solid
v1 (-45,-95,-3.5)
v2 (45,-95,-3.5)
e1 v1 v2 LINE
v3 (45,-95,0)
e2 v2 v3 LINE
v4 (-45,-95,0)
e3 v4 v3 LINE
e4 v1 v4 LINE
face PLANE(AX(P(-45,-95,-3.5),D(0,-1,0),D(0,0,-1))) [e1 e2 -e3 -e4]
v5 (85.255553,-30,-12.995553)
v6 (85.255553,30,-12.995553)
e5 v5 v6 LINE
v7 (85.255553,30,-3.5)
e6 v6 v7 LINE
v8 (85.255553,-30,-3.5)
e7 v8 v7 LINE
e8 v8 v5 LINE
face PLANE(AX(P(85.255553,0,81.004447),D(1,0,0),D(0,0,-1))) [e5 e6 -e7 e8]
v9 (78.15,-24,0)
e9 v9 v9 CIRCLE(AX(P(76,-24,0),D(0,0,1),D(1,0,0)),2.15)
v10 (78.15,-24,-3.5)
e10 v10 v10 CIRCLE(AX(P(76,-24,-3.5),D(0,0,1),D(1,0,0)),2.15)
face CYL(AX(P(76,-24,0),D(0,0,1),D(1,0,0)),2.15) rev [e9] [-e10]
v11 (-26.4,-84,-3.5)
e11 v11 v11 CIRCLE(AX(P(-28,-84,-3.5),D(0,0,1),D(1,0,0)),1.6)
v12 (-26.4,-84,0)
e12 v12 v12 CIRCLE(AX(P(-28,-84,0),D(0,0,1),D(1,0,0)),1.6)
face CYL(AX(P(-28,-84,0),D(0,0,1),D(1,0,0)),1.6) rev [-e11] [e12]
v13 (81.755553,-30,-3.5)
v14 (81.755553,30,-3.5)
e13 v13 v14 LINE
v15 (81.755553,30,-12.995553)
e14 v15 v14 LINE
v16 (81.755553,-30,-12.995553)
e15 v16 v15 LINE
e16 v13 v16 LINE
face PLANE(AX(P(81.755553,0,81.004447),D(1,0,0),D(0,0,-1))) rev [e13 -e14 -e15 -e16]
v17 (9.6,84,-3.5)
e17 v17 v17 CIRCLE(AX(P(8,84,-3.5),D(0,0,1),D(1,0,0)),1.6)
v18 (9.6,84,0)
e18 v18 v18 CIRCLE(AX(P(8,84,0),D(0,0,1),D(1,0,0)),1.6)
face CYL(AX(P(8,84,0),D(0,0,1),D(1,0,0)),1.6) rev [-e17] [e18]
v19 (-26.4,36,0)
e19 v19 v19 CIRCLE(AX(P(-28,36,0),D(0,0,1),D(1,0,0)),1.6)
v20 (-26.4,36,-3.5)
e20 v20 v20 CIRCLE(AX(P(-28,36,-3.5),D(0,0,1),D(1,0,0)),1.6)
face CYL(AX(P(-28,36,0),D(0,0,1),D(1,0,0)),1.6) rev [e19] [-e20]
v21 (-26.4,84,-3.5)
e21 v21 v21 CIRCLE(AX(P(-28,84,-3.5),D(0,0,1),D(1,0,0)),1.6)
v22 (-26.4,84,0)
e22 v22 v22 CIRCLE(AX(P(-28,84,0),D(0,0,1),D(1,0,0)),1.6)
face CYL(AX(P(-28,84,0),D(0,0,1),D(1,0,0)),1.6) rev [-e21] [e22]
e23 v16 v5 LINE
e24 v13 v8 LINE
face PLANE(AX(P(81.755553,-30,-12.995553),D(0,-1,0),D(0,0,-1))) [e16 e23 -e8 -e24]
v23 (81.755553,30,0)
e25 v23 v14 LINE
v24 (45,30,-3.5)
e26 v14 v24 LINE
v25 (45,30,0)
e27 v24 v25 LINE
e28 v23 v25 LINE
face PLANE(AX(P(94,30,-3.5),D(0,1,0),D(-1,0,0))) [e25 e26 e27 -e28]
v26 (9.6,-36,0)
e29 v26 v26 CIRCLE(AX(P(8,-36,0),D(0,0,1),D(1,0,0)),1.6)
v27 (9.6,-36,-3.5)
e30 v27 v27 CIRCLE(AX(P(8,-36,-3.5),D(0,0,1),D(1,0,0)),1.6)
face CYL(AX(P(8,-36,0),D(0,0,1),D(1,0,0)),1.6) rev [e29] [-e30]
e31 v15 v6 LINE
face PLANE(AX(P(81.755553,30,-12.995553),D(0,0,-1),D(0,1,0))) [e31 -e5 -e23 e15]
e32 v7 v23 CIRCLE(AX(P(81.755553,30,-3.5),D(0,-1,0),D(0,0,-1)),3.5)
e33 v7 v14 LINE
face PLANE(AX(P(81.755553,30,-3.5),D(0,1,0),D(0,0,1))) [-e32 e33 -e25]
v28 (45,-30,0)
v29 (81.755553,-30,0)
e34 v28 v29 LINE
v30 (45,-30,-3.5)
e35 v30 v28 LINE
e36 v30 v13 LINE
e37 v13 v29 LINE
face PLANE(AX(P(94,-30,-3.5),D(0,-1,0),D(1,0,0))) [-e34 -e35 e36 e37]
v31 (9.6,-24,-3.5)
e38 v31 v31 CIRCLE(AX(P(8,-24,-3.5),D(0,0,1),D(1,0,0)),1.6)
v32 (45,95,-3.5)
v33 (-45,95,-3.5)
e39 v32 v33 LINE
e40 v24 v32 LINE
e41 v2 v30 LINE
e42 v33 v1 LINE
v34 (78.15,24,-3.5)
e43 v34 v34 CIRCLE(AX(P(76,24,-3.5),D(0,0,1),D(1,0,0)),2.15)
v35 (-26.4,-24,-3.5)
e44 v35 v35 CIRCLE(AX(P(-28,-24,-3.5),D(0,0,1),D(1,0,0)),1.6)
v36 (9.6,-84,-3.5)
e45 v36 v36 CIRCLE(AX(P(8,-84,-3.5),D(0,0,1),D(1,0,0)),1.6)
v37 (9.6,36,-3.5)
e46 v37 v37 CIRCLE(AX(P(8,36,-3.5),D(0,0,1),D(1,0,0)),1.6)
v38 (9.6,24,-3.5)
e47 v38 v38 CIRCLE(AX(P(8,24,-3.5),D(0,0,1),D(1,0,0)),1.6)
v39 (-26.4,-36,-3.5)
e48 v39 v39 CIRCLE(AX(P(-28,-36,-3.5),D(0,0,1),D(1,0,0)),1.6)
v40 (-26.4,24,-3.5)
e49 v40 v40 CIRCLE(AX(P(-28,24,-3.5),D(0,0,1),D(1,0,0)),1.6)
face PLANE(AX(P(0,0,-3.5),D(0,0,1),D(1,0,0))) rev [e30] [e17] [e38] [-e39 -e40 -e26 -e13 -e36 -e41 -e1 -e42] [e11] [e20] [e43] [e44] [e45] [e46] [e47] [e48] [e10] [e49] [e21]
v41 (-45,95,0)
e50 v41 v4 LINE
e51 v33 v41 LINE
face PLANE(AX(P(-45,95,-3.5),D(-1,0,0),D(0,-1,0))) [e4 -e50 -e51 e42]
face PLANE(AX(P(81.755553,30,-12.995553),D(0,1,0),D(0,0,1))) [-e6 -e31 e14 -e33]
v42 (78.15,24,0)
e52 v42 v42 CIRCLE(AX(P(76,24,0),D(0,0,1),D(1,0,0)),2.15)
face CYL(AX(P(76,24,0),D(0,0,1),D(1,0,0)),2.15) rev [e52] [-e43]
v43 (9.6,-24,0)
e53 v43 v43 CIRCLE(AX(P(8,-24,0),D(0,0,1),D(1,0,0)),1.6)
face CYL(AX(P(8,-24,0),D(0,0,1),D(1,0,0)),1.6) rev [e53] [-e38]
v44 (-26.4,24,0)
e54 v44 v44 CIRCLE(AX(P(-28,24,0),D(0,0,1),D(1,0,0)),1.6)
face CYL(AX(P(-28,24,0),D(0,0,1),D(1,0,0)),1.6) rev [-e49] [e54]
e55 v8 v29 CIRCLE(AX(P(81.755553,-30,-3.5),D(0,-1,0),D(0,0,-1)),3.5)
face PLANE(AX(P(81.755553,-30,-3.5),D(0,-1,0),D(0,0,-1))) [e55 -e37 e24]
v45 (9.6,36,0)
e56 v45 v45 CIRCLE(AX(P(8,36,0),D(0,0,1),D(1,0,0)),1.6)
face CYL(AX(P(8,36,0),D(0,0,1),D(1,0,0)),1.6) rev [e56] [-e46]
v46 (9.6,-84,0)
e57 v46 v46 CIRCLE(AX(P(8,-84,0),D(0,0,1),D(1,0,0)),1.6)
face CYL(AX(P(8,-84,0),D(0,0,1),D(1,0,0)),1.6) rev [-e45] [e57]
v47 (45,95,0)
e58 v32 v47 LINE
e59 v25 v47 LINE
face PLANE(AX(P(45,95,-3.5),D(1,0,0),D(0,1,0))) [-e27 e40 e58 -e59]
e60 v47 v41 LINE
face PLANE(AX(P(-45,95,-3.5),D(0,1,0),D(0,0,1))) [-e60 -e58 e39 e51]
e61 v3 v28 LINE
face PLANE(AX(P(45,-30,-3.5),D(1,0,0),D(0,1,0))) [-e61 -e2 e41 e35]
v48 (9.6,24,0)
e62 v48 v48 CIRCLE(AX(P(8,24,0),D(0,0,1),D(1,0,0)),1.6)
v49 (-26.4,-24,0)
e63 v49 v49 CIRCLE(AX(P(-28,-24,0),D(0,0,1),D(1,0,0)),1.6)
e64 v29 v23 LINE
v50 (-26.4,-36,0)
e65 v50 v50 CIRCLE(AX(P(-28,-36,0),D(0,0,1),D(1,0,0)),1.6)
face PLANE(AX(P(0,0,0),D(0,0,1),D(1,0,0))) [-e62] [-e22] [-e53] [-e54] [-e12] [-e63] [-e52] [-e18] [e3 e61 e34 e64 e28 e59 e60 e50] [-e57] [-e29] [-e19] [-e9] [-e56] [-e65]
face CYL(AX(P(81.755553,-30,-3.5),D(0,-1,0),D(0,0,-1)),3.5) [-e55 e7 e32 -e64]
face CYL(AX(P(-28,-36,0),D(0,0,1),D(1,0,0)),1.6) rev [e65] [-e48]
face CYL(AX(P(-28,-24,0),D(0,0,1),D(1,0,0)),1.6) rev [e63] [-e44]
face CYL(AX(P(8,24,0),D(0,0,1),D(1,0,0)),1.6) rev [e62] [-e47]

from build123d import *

# Parameters (mm, degrees)
BASE_FLANGIA1_DEPTH                  = 3.5
PIEGATURA_START                      = -30
PIEGATURA_DELLO_SCHIZZO1_DEPTH       = 60
PIEGATURA_DELLO_SCHIZZO1_2_OUTLINE_W = 3.5
PIEGATURA_DELLO_SCHIZZO1_2_OUTLINE_H = 9.495553214
PIEGATURA_DELLO_SCHIZZO1_2_DEPTH     = 60
FORO_PER_VITE_M4_1_D                 = 4.3
FORO_PER_VITE_M4_1_DEPTH             = 20
FORO_PER_VITE_M4_1_TIP               = 1.291850331
FORO_PER_VITE_M3_1_AT_2_COUNT        = 2
FORO_PER_VITE_M3_1_AT_2_PITCH        = 48
FORO_PER_VITE_M3_1_AT_3_COUNT        = 2
FORO_PER_VITE_M3_1_AT_3_PITCH        = 60
FORO_PER_VITE_M3_1_AT_4_COUNT        = 2
FORO_PER_VITE_M3_1_AT_4_PITCH        = 36
RIPETIZIONE_A_L1_COUNT               = 2
RIPETIZIONE_A_L1_PITCH               = 60
RIPETIZIONE_A_L1_COL_COUNT           = 2
RIPETIZIONE_A_L1_COL_PITCH           = 60


# Read off the part's stored shape, not the designer's step: Piegatura dello schizzo1
# Sheet-metal steps are written as plain solids
with BuildPart() as part:
    # Schizzo1 → Base-Flangia1 (new body)
    with BuildSketch(Plane.XY):
        Polygon((-45, 95), (45, 95), (45, 30), (94, 30), (94, -30), (45, -30), (45, -95), (-45, -95), align=None)
    extrude(amount=-BASE_FLANGIA1_DEPTH)

    # Piegatura dello schizzo1 outline → Piegatura dello schizzo1 (cut)
    with BuildSketch(Plane(origin=(0, 0, 0), x_dir=(1, 0, 0), z_dir=(0, 1, 0)).offset(PIEGATURA_START)):
        with BuildLine():
            Line((94, 3.5), (85.255553214, 3.5))
            ThreePointArc((85.255553214, 3.5), (84.230426948, 1.025126266), (81.755553214, 0))
            Line((81.755553214, 0), (94, 0))
            Line((94, 0), (94, 3.5))
        make_face()
    extrude(amount=PIEGATURA_DELLO_SCHIZZO1_DEPTH, mode=Mode.SUBTRACT)

    # Piegatura dello schizzo1 2 outline → Piegatura dello schizzo1 2 (add)
    with BuildSketch(Plane(origin=(0, 0, 0), x_dir=(1, 0, 0), z_dir=(0, 1, 0)).offset(PIEGATURA_START)):
        with Locations((83.505553214, 8.247776607)):
            Rectangle(PIEGATURA_DELLO_SCHIZZO1_2_OUTLINE_W, PIEGATURA_DELLO_SCHIZZO1_2_OUTLINE_H)
    extrude(amount=PIEGATURA_DELLO_SCHIZZO1_2_DEPTH)

    # Foro per Vite M4-1
    with Locations(Plane(origin=(76, 24, 0), x_dir=(1, 0, 0), z_dir=(0, 0, 1))):
        with Locations((0, 0), (0, -48)):
            Hole(FORO_PER_VITE_M4_1_D / 2, depth=FORO_PER_VITE_M4_1_DEPTH)
            with Locations((0, 0, -(FORO_PER_VITE_M4_1_DEPTH + FORO_PER_VITE_M4_1_TIP / 2))):  # 118° drill point
                Cone(0, FORO_PER_VITE_M4_1_D / 2, FORO_PER_VITE_M4_1_TIP, mode=Mode.SUBTRACT)

    # Schizzo9 → Foro per Vite M3-1 (revolve, cut)
    with BuildSketch(Plane(origin=(-28, 24, 0), x_dir=(0, -1, 0), z_dir=(1, 0, 0))):
        Polygon((0, 0), (0, 20.96137699), (1.6, 20), (1.6, 0), align=None)
    foro_per_vite_m3_1 = revolve(axis=Axis((-28, 24, 6.35), (0, 0, -1)), mode=Mode.SUBTRACT)

    # Foro per Vite M3-1 at 2: Foro per Vite M3-1 ×2
    with Locations(*[(0, -i * FORO_PER_VITE_M3_1_AT_2_PITCH, 0) for i in range(1, FORO_PER_VITE_M3_1_AT_2_COUNT)]):
        add(foro_per_vite_m3_1, mode=Mode.SUBTRACT)

    # Foro per Vite M3-1 at 3: Foro per Vite M3-1 ×2
    with Locations(*[Vector(0.6000000000000001, -0.7999999999999999, 0) * (i * FORO_PER_VITE_M3_1_AT_3_PITCH) for i in range(1, FORO_PER_VITE_M3_1_AT_3_COUNT)]):
        add(foro_per_vite_m3_1, mode=Mode.SUBTRACT)

    # Foro per Vite M3-1 at 4: Foro per Vite M3-1 ×2
    with Locations(*[(i * FORO_PER_VITE_M3_1_AT_4_PITCH, 0, 0) for i in range(1, FORO_PER_VITE_M3_1_AT_4_COUNT)]):
        add(foro_per_vite_m3_1, mode=Mode.SUBTRACT)

    # Ripetizione a L1: Foro per Vite M3-1 ×2
    with Locations(*[(0, -i * RIPETIZIONE_A_L1_PITCH, 0) for i in range(1, RIPETIZIONE_A_L1_COUNT)]):
        add(foro_per_vite_m3_1, mode=Mode.SUBTRACT)

    # Ripetizione a L1 copy 1 sketch → Ripetizione a L1 copy 1 (revolve, cut)
    with BuildSketch(Plane(origin=(-28, -84, 0), x_dir=(0, -1, 0), z_dir=(1, 0, 0))):
        Polygon((0, 0), (0, 20.96137699), (1.6, 20), (1.6, 0), align=None)
    revolve(axis=Axis((-28, -84, 6.35), (0, 0, -1)), mode=Mode.SUBTRACT)

    # Ripetizione a L1 copy 2 sketch → Ripetizione a L1 copy 2 (revolve, cut)
    with BuildSketch(Plane(origin=(8, -84, 0), x_dir=(0, -1, 0), z_dir=(1, 0, 0))):
        Polygon((0, 0), (0, 20.96137699), (1.6, 20), (1.6, 0), align=None)
    revolve(axis=Axis((8, -84, 6.35), (0, 0, -1)), mode=Mode.SUBTRACT)

    # Ripetizione a L1 copy 3 sketch → Ripetizione a L1 copy 3 (revolve, cut)
    with BuildSketch(Plane(origin=(8, -36, 0), x_dir=(0, -1, 0), z_dir=(1, 0, 0))):
        Polygon((0, 0), (0, 20.96137699), (1.6, 20), (1.6, 0), align=None)
    revolve(axis=Axis((8, -36, 6.35), (0, 0, -1)), mode=Mode.SUBTRACT)

    # Ripetizione a L1 col: Foro per Vite M3-1 ×2
    with Locations(*[(0, i * RIPETIZIONE_A_L1_COL_PITCH, 0) for i in range(1, RIPETIZIONE_A_L1_COL_COUNT)]):
        add(foro_per_vite_m3_1, mode=Mode.SUBTRACT)

    # Ripetizione a L1 col copy 1 sketch → Ripetizione a L1 col copy 1 (revolve, cut)
    with BuildSketch(Plane(origin=(-28, 36, 0), x_dir=(0, -1, 0), z_dir=(1, 0, 0))):
        Polygon((0, 0), (0, 20.96137699), (1.6, 20), (1.6, 0), align=None)
    revolve(axis=Axis((-28, 36, 6.35), (0, 0, -1)), mode=Mode.SUBTRACT)

    # Ripetizione a L1 col copy 2 sketch → Ripetizione a L1 col copy 2 (revolve, cut)
    with BuildSketch(Plane(origin=(8, 36, 0), x_dir=(0, -1, 0), z_dir=(1, 0, 0))):
        Polygon((0, 0), (0, 20.96137699), (1.6, 20), (1.6, 0), align=None)
    revolve(axis=Axis((8, 36, 6.35), (0, 0, -1)), mode=Mode.SUBTRACT)

    # Ripetizione a L1 col copy 3 sketch → Ripetizione a L1 col copy 3 (revolve, cut)
    with BuildSketch(Plane(origin=(8, 84, 0), x_dir=(0, -1, 0), z_dir=(1, 0, 0))):
        Polygon((0, 0), (0, 20.96137699), (1.6, 20), (1.6, 0), align=None)
    revolve(axis=Axis((8, 84, 6.35), (0, 0, -1)), mode=Mode.SUBTRACT)


solid = part.part
